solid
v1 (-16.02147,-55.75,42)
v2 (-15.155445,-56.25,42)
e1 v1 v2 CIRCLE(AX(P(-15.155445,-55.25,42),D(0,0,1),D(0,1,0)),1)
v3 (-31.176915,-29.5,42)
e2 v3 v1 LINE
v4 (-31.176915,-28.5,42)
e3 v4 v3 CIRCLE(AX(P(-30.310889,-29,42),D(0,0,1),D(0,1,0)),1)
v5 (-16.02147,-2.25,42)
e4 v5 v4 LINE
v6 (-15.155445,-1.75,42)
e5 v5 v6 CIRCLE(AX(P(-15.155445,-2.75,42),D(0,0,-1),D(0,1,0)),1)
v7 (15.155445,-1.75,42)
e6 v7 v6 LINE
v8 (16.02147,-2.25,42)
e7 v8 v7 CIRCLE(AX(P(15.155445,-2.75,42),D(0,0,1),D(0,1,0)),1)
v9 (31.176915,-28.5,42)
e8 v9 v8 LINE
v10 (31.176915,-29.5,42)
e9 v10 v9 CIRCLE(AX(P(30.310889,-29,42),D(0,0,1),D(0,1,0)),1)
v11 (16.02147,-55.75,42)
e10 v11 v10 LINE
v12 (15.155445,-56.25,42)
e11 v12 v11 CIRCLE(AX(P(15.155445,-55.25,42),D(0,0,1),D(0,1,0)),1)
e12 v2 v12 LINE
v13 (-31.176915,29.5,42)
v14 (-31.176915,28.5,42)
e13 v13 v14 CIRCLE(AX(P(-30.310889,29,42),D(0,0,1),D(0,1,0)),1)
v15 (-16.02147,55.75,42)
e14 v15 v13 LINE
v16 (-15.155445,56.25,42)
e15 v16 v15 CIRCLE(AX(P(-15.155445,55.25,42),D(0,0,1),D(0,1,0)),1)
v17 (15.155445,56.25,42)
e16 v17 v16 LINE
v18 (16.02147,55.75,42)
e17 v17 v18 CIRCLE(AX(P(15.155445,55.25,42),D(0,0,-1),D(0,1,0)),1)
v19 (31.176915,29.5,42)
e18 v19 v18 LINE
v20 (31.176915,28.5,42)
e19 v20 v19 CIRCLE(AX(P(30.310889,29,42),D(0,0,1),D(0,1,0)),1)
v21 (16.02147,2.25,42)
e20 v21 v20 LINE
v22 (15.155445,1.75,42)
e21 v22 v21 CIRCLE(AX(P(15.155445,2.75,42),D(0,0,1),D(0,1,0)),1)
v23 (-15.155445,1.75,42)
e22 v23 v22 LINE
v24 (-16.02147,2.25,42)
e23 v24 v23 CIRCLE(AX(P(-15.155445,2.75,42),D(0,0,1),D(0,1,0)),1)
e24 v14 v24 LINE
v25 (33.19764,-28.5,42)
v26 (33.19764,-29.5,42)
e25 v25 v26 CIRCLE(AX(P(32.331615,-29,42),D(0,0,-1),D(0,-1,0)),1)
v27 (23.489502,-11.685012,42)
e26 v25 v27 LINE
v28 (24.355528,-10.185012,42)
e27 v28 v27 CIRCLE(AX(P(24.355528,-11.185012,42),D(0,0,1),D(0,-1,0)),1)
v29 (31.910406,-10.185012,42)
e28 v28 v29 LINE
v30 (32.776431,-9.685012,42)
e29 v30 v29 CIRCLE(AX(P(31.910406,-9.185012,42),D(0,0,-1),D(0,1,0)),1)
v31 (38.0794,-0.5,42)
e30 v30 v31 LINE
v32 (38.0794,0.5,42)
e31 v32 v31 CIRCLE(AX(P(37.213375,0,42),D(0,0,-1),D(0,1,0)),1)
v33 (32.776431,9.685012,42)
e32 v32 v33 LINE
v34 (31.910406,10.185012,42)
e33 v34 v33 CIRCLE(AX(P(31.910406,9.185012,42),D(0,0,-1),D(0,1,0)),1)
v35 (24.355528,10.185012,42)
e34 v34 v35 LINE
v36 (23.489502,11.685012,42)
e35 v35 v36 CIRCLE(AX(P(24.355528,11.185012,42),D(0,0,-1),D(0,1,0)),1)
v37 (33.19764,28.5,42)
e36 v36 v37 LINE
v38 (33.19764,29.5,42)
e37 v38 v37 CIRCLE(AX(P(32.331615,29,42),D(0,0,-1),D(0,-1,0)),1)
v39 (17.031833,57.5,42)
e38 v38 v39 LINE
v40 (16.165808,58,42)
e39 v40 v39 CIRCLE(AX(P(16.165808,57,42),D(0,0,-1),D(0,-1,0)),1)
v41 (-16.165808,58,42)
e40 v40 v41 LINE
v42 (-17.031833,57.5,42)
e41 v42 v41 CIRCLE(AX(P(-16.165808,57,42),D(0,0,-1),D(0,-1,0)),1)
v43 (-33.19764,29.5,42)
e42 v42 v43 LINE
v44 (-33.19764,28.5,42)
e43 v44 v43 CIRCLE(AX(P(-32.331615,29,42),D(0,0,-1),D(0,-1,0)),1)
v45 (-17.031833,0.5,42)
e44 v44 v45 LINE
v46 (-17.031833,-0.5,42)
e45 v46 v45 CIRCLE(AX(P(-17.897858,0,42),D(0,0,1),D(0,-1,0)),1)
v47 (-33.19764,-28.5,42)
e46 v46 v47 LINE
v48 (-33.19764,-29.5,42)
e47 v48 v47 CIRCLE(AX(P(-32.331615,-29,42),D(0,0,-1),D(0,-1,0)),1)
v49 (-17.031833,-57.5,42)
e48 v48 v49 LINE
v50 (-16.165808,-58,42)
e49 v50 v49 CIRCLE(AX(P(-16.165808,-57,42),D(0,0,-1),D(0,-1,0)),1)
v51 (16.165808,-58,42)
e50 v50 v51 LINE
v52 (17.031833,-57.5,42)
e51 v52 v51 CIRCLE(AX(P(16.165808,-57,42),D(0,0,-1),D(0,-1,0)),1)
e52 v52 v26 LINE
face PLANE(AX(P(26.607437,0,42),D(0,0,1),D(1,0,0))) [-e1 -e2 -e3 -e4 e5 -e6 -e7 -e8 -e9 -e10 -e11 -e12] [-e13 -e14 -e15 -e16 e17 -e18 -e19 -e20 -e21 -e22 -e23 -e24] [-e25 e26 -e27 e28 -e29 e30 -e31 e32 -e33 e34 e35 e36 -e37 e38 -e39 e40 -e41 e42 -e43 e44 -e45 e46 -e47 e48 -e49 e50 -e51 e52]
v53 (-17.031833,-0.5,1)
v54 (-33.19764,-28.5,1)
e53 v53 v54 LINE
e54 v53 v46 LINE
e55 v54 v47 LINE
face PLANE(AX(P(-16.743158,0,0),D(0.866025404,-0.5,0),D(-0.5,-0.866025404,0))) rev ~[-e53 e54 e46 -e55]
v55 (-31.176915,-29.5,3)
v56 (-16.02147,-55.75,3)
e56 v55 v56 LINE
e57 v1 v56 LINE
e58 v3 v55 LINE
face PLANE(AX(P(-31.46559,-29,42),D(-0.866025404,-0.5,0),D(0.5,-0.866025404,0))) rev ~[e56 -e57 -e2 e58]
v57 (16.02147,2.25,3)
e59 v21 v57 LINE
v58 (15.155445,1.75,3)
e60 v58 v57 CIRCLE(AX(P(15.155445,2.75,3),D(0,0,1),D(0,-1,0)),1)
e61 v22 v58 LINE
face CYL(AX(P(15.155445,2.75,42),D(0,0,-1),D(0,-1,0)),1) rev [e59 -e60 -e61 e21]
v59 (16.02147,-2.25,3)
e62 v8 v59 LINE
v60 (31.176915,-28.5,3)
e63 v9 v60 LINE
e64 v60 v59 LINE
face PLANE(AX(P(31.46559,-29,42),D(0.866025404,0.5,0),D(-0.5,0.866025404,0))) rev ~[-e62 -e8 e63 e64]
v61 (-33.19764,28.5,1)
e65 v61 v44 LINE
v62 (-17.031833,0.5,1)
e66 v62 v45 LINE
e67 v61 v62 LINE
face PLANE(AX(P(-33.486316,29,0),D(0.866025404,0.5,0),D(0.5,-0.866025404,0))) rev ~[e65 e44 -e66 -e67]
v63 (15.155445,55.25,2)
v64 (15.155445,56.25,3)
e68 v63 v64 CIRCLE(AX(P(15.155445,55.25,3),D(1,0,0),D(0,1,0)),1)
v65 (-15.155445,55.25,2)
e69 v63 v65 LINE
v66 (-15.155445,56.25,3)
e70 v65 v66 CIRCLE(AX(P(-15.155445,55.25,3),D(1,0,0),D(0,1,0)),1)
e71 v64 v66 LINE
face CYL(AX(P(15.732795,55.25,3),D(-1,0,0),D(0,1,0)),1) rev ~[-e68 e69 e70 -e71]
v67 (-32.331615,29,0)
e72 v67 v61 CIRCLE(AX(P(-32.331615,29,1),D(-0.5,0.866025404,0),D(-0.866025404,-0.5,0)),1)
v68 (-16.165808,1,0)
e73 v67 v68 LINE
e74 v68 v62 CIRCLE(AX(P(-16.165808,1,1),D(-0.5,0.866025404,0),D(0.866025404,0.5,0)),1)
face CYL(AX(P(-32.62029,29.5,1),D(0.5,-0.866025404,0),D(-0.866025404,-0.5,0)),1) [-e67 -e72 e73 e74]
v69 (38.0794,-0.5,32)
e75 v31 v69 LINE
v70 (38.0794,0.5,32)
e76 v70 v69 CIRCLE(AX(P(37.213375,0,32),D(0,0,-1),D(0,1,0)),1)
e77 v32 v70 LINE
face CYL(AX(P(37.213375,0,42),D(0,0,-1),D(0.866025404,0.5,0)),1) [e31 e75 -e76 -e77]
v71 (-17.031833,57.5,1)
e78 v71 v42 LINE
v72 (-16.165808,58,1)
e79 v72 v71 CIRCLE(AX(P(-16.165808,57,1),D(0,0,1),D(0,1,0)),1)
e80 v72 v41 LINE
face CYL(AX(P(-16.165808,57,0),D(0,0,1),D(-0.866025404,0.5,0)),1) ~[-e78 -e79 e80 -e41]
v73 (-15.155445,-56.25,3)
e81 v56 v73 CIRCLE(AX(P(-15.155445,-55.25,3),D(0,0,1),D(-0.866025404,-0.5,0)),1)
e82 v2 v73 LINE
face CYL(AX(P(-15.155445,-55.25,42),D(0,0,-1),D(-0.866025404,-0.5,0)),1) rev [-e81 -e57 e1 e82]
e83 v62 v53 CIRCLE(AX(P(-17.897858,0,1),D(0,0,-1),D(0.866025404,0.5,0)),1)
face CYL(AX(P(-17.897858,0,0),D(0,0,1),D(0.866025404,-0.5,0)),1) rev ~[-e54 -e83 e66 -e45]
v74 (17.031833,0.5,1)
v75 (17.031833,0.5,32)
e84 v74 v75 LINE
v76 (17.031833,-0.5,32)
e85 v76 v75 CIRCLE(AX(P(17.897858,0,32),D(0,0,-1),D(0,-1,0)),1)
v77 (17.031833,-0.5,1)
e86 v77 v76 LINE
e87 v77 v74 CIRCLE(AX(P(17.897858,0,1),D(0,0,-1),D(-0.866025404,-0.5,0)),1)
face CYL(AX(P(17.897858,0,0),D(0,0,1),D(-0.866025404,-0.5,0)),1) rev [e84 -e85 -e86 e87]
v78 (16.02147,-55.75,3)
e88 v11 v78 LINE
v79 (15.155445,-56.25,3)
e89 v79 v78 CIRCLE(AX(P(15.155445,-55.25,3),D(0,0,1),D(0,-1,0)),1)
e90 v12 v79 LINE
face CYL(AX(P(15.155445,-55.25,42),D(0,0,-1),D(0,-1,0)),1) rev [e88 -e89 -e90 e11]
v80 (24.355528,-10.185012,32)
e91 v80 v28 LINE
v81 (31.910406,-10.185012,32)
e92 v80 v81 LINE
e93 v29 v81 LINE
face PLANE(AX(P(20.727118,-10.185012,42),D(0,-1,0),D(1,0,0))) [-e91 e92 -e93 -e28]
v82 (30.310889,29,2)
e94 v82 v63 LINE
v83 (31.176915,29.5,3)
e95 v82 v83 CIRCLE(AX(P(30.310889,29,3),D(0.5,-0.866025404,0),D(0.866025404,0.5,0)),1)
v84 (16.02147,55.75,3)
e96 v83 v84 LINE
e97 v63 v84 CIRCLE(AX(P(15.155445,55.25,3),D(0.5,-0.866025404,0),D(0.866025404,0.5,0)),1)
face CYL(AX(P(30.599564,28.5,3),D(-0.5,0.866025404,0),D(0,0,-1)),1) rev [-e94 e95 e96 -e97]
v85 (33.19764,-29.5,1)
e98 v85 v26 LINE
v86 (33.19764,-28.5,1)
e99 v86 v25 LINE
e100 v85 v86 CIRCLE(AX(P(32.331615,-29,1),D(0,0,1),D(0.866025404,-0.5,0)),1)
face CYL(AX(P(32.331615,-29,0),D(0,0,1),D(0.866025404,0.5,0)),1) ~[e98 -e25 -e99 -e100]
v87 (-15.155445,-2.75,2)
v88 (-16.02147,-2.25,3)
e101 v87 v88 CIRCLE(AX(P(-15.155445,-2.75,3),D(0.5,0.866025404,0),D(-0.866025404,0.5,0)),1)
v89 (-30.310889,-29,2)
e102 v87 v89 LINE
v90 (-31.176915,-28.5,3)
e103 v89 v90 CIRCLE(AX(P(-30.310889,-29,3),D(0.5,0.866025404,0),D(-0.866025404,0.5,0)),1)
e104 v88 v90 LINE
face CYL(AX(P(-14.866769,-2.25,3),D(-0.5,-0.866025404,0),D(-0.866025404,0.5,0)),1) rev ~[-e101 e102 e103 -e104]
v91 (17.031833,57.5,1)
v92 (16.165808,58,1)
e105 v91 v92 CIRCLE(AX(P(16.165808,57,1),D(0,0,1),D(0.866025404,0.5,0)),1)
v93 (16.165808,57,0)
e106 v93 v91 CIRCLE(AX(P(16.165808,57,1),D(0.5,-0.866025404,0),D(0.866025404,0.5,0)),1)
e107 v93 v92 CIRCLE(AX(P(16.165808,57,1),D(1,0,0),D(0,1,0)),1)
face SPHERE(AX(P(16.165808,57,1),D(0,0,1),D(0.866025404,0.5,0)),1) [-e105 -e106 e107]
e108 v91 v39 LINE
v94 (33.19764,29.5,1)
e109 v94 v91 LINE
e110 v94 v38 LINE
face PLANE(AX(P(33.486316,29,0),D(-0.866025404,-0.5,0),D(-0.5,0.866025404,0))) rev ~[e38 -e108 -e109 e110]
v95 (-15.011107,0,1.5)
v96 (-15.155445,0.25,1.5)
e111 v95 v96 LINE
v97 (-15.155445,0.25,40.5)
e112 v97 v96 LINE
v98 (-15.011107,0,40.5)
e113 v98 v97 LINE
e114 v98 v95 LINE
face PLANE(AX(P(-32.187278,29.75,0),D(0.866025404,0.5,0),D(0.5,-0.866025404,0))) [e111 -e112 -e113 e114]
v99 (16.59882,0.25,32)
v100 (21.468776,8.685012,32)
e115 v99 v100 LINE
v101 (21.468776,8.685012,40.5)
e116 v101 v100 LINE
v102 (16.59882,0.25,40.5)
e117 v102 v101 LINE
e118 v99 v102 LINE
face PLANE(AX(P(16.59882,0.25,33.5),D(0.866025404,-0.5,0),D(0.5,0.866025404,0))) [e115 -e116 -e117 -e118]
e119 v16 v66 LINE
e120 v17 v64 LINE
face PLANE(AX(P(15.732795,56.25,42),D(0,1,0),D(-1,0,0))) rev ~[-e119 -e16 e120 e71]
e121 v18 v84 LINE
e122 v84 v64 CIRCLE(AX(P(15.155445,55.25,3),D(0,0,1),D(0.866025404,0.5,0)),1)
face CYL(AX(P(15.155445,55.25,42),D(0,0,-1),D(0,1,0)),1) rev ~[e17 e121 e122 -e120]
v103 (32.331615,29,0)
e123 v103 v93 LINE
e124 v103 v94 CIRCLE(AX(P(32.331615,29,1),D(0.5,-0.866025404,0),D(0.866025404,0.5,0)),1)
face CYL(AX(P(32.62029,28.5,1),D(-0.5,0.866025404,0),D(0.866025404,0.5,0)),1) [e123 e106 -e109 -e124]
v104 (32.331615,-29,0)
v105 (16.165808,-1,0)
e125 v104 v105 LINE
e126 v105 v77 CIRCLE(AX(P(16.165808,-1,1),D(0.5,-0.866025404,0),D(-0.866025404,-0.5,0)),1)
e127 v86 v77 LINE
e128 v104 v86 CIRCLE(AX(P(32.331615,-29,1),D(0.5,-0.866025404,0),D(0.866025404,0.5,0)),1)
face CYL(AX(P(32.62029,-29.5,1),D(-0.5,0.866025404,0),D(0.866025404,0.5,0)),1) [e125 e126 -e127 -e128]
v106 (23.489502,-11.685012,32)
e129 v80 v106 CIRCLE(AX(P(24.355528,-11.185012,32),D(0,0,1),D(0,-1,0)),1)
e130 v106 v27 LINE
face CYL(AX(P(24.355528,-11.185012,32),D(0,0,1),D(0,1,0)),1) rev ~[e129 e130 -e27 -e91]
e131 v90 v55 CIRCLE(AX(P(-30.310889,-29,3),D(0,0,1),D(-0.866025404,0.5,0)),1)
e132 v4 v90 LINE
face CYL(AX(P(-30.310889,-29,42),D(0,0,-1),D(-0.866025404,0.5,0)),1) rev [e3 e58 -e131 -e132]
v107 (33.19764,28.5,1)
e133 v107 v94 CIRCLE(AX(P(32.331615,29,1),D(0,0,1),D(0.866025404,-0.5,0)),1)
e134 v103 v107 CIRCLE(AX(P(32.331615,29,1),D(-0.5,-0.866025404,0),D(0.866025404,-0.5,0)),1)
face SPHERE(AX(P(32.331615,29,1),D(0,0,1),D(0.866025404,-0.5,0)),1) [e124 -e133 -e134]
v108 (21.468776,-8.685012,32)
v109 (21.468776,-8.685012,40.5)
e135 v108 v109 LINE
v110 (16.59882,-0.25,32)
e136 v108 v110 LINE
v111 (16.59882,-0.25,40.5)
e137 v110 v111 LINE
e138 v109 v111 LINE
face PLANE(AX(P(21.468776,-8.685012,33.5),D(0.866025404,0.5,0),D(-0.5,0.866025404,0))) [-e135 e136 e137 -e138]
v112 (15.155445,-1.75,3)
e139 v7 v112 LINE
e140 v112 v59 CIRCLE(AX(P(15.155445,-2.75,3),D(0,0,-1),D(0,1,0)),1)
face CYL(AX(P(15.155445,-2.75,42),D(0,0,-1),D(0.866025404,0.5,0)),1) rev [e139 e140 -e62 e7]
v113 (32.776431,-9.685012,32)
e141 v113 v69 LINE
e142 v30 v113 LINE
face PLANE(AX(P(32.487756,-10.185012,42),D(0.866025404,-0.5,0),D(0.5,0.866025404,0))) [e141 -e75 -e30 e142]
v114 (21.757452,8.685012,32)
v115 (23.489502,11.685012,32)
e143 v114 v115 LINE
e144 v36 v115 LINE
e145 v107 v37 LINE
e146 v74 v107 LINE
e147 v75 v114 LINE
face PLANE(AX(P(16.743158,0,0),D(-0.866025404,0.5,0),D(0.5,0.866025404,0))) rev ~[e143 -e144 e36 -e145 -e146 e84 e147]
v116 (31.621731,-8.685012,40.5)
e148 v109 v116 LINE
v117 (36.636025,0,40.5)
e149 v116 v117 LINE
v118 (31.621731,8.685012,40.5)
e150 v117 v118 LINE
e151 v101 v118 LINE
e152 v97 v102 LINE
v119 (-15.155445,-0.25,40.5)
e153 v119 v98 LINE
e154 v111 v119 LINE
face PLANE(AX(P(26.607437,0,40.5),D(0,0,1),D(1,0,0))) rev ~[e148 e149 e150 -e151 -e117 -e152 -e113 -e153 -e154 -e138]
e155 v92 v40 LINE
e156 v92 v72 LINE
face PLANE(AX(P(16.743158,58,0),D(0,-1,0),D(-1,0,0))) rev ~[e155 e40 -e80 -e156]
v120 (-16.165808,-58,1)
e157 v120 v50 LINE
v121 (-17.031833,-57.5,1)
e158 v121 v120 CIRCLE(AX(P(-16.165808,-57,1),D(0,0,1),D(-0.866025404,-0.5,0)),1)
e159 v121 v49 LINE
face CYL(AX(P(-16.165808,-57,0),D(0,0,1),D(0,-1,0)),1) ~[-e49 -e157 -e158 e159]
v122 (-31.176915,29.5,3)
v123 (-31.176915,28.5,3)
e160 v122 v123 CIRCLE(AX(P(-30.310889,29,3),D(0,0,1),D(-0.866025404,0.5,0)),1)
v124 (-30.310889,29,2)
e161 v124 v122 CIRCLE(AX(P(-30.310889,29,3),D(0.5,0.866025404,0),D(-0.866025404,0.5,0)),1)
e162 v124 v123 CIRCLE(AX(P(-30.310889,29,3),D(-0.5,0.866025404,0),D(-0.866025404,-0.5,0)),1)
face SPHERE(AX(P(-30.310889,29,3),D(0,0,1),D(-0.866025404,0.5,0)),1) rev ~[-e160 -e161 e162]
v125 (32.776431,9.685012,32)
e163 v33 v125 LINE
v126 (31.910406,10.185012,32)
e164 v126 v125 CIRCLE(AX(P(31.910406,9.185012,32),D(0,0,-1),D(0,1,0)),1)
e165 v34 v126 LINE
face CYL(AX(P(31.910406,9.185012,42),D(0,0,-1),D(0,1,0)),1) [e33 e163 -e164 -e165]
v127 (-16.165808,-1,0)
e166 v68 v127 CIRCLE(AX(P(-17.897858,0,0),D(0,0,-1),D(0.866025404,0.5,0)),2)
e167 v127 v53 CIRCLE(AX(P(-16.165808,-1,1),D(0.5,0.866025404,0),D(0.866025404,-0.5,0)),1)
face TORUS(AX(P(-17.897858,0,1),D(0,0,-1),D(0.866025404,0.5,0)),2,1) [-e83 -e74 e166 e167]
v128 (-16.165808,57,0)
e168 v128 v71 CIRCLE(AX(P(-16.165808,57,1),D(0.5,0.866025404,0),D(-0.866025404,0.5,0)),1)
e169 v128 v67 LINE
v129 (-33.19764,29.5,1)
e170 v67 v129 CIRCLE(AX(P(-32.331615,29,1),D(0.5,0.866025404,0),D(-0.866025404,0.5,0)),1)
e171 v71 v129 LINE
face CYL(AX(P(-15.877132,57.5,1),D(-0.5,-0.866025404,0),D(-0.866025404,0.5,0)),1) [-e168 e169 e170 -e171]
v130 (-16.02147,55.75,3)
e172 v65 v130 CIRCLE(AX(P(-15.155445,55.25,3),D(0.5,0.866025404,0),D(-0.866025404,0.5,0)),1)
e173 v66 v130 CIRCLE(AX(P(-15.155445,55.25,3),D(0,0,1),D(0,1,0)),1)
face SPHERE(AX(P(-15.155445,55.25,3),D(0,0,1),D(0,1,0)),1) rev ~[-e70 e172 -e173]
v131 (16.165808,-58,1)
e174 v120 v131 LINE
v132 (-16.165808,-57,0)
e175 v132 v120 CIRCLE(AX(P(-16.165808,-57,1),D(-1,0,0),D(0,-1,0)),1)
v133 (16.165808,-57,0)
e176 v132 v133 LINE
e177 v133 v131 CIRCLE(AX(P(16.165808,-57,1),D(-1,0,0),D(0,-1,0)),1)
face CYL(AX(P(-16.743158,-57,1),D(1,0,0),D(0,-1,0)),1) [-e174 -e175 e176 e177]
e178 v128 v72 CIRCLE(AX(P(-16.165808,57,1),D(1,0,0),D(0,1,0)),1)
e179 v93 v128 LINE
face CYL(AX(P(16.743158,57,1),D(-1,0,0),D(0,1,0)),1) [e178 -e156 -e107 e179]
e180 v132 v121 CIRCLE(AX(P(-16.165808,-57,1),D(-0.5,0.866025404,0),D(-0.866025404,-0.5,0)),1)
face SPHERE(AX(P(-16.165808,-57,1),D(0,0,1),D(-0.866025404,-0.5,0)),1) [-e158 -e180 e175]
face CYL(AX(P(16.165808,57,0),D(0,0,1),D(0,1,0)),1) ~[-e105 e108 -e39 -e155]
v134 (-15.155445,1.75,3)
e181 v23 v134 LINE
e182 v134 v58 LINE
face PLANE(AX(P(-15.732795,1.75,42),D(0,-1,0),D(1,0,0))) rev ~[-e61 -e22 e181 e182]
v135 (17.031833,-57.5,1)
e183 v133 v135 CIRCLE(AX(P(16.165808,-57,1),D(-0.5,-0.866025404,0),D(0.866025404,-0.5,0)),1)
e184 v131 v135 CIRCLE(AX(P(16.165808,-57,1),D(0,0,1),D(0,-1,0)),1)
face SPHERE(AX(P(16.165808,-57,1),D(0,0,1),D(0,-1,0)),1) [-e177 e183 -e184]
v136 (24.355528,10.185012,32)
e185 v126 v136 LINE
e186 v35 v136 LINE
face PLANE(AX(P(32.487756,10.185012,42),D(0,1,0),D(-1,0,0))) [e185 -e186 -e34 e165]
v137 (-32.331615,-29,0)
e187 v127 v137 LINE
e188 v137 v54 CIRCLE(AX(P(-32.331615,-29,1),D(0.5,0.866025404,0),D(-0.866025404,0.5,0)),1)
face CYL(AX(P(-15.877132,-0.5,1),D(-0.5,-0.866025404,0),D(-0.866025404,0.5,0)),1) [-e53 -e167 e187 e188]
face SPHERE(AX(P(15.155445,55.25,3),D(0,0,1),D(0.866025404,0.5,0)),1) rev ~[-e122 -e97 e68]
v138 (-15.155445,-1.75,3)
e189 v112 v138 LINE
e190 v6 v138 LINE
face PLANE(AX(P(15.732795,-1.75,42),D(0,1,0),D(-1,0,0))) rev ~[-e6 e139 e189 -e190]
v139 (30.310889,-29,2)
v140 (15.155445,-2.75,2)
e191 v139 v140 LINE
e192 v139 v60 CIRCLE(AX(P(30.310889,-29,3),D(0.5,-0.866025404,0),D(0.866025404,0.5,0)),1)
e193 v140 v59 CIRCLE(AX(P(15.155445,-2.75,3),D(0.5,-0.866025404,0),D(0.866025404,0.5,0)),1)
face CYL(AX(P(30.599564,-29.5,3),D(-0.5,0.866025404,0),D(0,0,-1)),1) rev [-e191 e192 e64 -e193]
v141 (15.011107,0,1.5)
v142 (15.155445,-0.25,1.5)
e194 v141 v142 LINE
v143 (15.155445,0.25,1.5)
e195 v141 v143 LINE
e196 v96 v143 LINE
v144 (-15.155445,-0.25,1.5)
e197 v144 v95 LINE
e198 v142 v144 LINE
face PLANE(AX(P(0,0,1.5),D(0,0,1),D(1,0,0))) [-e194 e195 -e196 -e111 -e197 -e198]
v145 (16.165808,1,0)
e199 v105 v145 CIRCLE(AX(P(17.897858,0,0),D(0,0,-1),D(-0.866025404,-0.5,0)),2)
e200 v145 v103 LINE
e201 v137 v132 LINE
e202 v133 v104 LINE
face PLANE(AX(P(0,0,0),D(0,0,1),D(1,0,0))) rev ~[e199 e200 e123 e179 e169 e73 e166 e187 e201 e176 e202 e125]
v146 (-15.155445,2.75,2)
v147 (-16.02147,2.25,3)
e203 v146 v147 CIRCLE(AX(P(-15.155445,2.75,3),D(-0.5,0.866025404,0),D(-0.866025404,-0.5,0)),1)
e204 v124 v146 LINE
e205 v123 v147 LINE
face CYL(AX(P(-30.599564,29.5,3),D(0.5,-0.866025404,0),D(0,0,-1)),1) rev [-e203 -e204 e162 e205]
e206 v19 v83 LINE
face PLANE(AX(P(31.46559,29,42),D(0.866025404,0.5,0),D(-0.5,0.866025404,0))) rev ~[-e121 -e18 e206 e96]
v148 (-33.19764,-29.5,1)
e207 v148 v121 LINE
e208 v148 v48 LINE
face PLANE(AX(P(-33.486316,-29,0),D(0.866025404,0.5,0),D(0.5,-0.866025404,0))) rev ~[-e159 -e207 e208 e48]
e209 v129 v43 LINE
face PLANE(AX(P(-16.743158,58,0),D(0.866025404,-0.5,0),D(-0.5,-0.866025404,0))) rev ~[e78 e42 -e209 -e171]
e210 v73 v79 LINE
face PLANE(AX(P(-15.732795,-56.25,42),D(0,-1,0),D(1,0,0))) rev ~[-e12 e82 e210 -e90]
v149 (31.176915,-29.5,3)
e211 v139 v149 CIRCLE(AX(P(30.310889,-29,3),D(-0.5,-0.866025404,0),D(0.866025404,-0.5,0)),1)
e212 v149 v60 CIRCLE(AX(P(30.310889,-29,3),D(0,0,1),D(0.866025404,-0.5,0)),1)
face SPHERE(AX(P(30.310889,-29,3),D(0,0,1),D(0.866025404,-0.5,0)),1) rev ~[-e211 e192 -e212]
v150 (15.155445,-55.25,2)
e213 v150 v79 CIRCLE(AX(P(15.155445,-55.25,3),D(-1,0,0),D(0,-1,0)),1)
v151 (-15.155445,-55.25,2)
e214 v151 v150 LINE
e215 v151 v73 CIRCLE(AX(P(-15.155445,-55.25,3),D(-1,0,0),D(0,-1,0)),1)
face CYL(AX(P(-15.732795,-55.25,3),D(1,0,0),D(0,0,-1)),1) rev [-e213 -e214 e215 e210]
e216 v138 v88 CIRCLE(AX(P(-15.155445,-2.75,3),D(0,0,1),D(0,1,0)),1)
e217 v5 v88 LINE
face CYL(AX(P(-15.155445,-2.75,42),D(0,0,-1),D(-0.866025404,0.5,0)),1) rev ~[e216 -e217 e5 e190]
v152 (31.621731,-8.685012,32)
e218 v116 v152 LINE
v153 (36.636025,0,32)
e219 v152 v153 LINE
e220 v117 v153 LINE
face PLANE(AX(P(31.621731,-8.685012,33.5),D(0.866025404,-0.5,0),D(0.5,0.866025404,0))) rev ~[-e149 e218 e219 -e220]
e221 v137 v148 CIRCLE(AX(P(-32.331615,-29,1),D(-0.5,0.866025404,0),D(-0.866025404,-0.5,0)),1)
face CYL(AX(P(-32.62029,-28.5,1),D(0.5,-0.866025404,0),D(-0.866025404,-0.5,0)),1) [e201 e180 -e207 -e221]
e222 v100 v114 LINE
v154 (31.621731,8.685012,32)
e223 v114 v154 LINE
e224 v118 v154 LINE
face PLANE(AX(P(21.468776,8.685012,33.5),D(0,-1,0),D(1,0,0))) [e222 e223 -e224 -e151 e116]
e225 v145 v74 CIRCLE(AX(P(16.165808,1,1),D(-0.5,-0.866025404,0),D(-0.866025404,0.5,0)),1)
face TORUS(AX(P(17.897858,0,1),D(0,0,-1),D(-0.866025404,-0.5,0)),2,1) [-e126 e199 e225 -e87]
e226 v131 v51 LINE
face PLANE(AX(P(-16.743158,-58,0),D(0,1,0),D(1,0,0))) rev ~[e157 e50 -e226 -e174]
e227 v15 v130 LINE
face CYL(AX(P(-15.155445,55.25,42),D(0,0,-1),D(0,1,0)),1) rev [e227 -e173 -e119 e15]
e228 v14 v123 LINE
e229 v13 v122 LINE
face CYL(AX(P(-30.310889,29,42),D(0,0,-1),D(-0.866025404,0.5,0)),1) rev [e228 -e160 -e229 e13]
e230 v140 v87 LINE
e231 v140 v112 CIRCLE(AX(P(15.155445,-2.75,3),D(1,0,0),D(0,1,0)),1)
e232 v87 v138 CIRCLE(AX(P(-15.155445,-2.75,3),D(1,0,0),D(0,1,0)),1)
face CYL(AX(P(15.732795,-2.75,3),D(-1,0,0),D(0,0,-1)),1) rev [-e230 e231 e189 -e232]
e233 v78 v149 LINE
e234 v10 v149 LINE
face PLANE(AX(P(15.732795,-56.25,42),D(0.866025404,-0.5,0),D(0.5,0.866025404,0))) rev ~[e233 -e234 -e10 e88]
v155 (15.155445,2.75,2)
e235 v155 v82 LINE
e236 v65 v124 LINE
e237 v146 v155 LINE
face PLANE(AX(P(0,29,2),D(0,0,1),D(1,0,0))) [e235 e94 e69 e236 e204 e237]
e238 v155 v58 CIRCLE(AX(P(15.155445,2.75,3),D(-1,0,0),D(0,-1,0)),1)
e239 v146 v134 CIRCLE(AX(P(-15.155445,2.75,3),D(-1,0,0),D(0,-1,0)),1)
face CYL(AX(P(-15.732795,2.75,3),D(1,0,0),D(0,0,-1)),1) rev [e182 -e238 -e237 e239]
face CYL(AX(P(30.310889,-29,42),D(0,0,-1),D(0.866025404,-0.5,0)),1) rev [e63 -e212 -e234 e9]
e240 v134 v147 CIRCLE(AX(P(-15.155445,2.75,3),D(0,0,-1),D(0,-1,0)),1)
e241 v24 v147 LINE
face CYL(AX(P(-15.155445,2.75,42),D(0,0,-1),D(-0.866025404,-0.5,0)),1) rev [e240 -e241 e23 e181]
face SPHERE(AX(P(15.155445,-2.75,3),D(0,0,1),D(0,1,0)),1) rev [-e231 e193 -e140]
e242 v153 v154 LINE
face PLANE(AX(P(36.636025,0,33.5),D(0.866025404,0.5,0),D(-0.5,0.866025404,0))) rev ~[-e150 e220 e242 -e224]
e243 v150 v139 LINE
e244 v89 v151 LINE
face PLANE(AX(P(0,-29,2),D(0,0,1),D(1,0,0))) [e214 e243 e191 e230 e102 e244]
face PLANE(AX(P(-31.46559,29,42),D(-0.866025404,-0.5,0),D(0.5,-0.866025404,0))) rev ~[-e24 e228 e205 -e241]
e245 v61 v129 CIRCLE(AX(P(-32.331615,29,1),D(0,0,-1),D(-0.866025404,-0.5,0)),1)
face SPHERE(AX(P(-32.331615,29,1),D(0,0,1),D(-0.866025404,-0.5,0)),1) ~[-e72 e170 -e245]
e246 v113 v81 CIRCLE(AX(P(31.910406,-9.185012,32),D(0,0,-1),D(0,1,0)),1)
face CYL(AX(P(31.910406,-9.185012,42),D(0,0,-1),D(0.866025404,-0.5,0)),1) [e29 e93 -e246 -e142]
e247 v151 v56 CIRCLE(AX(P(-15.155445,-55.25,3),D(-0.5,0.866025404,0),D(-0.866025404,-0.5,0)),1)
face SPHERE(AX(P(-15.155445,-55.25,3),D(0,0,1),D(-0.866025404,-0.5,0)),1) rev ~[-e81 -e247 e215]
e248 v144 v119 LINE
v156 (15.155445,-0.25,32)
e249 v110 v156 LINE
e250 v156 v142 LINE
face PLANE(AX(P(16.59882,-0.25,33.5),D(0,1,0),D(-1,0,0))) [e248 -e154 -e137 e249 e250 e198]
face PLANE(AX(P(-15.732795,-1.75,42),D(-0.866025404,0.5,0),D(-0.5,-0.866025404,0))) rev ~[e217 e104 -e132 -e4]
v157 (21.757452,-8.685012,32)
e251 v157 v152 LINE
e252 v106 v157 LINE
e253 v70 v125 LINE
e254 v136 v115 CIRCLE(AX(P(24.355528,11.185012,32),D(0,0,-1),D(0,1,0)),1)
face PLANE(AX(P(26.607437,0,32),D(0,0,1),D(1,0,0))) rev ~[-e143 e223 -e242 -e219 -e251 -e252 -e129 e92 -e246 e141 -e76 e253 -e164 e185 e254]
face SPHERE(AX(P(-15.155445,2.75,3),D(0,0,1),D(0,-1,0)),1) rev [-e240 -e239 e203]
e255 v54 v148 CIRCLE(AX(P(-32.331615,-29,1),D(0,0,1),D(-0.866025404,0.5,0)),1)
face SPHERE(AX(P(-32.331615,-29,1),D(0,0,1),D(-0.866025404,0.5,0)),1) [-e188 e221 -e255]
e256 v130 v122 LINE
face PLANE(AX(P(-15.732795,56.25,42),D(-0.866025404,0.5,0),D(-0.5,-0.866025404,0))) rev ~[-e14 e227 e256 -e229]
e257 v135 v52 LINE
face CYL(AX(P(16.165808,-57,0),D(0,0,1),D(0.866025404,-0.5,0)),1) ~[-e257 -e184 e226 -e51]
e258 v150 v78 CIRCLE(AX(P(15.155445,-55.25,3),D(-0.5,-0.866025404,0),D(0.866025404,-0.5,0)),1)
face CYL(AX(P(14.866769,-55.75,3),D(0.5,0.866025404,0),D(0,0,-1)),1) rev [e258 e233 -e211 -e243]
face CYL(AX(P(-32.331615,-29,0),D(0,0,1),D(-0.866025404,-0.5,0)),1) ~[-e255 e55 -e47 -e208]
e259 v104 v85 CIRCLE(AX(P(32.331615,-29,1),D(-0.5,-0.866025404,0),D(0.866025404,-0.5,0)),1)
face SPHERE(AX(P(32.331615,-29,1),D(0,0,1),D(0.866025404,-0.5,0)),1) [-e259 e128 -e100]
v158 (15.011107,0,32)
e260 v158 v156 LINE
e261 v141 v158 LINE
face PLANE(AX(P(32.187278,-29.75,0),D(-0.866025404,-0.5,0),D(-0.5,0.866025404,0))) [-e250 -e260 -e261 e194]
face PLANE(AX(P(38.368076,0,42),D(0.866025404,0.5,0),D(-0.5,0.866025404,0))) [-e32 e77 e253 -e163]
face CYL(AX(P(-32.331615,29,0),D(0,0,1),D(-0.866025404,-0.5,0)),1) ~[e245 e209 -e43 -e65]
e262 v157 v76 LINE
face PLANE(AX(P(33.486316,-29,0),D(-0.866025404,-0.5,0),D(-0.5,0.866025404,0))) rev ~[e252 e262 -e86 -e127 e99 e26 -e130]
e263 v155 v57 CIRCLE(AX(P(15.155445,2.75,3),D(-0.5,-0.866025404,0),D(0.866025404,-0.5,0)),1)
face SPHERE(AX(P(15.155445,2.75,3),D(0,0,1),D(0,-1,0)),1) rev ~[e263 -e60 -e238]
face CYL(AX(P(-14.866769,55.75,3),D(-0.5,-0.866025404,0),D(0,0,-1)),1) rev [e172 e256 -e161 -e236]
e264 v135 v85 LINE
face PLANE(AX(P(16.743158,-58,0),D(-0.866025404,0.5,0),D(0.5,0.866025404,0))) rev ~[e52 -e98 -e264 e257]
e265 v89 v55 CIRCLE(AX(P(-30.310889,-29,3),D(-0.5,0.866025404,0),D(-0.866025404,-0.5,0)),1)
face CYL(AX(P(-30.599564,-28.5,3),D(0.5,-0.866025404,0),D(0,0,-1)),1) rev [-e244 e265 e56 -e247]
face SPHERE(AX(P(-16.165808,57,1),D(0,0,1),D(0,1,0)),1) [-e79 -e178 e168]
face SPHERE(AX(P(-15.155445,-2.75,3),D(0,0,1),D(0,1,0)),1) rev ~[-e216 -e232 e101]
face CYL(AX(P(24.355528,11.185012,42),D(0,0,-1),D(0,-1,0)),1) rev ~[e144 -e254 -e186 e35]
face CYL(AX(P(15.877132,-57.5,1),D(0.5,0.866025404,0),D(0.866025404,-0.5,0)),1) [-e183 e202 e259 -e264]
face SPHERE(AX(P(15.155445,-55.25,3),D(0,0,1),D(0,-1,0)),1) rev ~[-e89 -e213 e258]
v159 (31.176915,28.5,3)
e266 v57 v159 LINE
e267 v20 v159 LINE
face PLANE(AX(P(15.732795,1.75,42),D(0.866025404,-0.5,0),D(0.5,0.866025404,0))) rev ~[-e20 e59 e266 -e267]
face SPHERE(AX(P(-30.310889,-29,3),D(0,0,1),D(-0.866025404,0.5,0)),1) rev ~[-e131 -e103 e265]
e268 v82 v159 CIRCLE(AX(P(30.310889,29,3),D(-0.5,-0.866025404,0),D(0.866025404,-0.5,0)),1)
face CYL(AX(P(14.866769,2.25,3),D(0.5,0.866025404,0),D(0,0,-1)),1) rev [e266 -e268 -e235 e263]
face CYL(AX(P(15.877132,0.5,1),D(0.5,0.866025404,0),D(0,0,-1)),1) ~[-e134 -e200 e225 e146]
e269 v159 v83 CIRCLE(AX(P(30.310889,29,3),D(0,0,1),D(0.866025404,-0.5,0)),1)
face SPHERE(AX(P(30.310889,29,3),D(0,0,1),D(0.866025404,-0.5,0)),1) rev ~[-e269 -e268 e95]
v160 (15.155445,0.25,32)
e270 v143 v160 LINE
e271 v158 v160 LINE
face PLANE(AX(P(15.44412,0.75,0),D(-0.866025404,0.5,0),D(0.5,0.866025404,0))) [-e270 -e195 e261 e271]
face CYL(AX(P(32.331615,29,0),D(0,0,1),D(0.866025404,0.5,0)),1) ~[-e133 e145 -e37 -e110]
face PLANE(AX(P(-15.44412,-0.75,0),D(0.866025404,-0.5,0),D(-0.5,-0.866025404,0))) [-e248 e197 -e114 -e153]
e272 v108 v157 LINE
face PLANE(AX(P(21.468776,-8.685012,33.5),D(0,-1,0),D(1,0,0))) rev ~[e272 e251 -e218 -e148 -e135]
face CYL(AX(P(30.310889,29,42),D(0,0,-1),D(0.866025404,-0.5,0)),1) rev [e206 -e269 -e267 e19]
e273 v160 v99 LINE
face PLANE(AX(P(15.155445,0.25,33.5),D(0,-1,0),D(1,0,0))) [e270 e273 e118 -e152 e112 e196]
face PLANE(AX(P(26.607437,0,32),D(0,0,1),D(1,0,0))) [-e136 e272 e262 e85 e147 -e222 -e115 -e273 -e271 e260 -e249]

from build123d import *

# Parameters (mm, degrees)
F1_DEPTH = 42
F3_DEPTH = 40
F5_DEPTH = 10
F6_T     = -1.5
F7_R     = 1


# Not quite as in the source:
# - a shell that OpenCascade refuses in one call is made with other operations: the cavity is built on its own and cut out


with BuildPart() as f1:
    # F0 (on Top) → F1 (new body)
    with BuildSketch(Plane.XY):
        Polygon((-33.486315613, 29), (-16.7431578065, 0), (-33.486315613, -29), (-16.7431578065, -58), (16.7431578065, -58), (33.486315613, -29), (16.7431578065, 0), (33.486315613, 29), (16.7431578065, 58), (-16.7431578065, 58), align=None)
    extrude(amount=F1_DEPTH)

    # F2 (on face) → F3 (cut)
    with BuildSketch(Plane.XY.offset(42)):
        Polygon((15.7327948354, -1.75), (0, -1.75), (-15.7327948354, -1.75), (-31.4655896708, -29), (-15.7327948354, -56.25), (15.7327948354, -56.25), (31.4655896708, -29), align=None)
        Polygon((-15.7327948354, 1.75), (0, 1.75), (15.7327948354, 1.75), (31.4655896708, 29), (15.7327948354, 56.25), (-15.7327948354, 56.25), (-31.4655896708, 29), align=None)
    extrude(amount=-F3_DEPTH, mode=Mode.SUBTRACT)

    # F4 (on face) → F5 (join)
    with BuildSketch(Plane.XY.offset(42)):
        Polygon((32.4877562844, 10.1850116625), (20.7271178342, 10.1850116625), (14.8467986091, 0), (20.7271178342, -10.1850116625), (32.4877562844, -10.1850116625), (38.3680755094, 0), align=None)
    extrude(amount=-F5_DEPTH)

    # F6: a shell. OpenCascade refuses it in one call, so the cavity is built on its own and cut out:
    # the body offset inwards by the wall thickness, plus a prism from it out through each open face.
    f6_core = offset(f1.part, amount=F6_T, kind=Kind.INTERSECTION, mode=Mode.PRIVATE)
    f6_exits = [f6_core.faces().sort_by_distance(p)[0] for p in [
        (26.515913, 0, 33.5),
    ]]
    add(f6_core, mode=Mode.SUBTRACT)
    extrude(f6_exits, amount=-F6_T, mode=Mode.SUBTRACT)

    # F7
    f7_edges = [f1.edges().sort_by_distance(p)[0] for p in [
        (-33.486316, -29, 21),
        (-16.743158, 0, 21),
        (-33.486316, 29, 21),
        (-16.743158, 58, 21),
        (-16.743158, -58, 21),
        (16.743158, -58, 21),
        (33.486316, -29, 21),
        (16.743158, 0, 16),
        (33.486316, 29, 21),
        (16.743158, 58, 21),
        (-31.46559, 29, 22),
        (-15.732795, 56.25, 22),
        (15.732795, 56.25, 22),
        (31.46559, 29, 22),
        (15.732795, 1.75, 22),
        (-15.732795, 1.75, 22),
        (-31.46559, -29, 22),
        (-15.732795, -1.75, 22),
        (15.732795, -1.75, 22),
        (31.46559, -29, 22),
        (15.732795, -56.25, 22),
        (-15.732795, -56.25, 22),
        (0, 1.75, 2),
        (23.599192, 15.375, 2),
        (23.599192, 42.625, 2),
        (0, 56.25, 2),
        (-23.599192, 42.625, 2),
        (-23.599192, 15.375, 2),
        (0, -1.75, 2),
        (-23.599192, -15.375, 2),
        (-23.599192, -42.625, 2),
        (0, -56.25, 2),
        (23.599192, -42.625, 2),
        (23.599192, -15.375, 2),
        (-25.114737, 14.5, 0),
        (-25.114737, -14.5, 0),
        (-25.114737, -43.5, 0),
        (0, -58, 0),
        (25.114737, -43.5, 0),
        (25.114737, -14.5, 0),
        (25.114737, 14.5, 0),
        (25.114737, 43.5, 0),
        (0, 58, 0),
        (-25.114737, 43.5, 0),
        (22.623477, 10.185012, 37),
        (32.487756, 10.185012, 37),
        (38.368076, 0, 37),
        (32.487756, -10.185012, 37),
        (22.623477, -10.185012, 37),
    ]]
    fillet(f7_edges, radius=F7_R)


solid = f1.part
